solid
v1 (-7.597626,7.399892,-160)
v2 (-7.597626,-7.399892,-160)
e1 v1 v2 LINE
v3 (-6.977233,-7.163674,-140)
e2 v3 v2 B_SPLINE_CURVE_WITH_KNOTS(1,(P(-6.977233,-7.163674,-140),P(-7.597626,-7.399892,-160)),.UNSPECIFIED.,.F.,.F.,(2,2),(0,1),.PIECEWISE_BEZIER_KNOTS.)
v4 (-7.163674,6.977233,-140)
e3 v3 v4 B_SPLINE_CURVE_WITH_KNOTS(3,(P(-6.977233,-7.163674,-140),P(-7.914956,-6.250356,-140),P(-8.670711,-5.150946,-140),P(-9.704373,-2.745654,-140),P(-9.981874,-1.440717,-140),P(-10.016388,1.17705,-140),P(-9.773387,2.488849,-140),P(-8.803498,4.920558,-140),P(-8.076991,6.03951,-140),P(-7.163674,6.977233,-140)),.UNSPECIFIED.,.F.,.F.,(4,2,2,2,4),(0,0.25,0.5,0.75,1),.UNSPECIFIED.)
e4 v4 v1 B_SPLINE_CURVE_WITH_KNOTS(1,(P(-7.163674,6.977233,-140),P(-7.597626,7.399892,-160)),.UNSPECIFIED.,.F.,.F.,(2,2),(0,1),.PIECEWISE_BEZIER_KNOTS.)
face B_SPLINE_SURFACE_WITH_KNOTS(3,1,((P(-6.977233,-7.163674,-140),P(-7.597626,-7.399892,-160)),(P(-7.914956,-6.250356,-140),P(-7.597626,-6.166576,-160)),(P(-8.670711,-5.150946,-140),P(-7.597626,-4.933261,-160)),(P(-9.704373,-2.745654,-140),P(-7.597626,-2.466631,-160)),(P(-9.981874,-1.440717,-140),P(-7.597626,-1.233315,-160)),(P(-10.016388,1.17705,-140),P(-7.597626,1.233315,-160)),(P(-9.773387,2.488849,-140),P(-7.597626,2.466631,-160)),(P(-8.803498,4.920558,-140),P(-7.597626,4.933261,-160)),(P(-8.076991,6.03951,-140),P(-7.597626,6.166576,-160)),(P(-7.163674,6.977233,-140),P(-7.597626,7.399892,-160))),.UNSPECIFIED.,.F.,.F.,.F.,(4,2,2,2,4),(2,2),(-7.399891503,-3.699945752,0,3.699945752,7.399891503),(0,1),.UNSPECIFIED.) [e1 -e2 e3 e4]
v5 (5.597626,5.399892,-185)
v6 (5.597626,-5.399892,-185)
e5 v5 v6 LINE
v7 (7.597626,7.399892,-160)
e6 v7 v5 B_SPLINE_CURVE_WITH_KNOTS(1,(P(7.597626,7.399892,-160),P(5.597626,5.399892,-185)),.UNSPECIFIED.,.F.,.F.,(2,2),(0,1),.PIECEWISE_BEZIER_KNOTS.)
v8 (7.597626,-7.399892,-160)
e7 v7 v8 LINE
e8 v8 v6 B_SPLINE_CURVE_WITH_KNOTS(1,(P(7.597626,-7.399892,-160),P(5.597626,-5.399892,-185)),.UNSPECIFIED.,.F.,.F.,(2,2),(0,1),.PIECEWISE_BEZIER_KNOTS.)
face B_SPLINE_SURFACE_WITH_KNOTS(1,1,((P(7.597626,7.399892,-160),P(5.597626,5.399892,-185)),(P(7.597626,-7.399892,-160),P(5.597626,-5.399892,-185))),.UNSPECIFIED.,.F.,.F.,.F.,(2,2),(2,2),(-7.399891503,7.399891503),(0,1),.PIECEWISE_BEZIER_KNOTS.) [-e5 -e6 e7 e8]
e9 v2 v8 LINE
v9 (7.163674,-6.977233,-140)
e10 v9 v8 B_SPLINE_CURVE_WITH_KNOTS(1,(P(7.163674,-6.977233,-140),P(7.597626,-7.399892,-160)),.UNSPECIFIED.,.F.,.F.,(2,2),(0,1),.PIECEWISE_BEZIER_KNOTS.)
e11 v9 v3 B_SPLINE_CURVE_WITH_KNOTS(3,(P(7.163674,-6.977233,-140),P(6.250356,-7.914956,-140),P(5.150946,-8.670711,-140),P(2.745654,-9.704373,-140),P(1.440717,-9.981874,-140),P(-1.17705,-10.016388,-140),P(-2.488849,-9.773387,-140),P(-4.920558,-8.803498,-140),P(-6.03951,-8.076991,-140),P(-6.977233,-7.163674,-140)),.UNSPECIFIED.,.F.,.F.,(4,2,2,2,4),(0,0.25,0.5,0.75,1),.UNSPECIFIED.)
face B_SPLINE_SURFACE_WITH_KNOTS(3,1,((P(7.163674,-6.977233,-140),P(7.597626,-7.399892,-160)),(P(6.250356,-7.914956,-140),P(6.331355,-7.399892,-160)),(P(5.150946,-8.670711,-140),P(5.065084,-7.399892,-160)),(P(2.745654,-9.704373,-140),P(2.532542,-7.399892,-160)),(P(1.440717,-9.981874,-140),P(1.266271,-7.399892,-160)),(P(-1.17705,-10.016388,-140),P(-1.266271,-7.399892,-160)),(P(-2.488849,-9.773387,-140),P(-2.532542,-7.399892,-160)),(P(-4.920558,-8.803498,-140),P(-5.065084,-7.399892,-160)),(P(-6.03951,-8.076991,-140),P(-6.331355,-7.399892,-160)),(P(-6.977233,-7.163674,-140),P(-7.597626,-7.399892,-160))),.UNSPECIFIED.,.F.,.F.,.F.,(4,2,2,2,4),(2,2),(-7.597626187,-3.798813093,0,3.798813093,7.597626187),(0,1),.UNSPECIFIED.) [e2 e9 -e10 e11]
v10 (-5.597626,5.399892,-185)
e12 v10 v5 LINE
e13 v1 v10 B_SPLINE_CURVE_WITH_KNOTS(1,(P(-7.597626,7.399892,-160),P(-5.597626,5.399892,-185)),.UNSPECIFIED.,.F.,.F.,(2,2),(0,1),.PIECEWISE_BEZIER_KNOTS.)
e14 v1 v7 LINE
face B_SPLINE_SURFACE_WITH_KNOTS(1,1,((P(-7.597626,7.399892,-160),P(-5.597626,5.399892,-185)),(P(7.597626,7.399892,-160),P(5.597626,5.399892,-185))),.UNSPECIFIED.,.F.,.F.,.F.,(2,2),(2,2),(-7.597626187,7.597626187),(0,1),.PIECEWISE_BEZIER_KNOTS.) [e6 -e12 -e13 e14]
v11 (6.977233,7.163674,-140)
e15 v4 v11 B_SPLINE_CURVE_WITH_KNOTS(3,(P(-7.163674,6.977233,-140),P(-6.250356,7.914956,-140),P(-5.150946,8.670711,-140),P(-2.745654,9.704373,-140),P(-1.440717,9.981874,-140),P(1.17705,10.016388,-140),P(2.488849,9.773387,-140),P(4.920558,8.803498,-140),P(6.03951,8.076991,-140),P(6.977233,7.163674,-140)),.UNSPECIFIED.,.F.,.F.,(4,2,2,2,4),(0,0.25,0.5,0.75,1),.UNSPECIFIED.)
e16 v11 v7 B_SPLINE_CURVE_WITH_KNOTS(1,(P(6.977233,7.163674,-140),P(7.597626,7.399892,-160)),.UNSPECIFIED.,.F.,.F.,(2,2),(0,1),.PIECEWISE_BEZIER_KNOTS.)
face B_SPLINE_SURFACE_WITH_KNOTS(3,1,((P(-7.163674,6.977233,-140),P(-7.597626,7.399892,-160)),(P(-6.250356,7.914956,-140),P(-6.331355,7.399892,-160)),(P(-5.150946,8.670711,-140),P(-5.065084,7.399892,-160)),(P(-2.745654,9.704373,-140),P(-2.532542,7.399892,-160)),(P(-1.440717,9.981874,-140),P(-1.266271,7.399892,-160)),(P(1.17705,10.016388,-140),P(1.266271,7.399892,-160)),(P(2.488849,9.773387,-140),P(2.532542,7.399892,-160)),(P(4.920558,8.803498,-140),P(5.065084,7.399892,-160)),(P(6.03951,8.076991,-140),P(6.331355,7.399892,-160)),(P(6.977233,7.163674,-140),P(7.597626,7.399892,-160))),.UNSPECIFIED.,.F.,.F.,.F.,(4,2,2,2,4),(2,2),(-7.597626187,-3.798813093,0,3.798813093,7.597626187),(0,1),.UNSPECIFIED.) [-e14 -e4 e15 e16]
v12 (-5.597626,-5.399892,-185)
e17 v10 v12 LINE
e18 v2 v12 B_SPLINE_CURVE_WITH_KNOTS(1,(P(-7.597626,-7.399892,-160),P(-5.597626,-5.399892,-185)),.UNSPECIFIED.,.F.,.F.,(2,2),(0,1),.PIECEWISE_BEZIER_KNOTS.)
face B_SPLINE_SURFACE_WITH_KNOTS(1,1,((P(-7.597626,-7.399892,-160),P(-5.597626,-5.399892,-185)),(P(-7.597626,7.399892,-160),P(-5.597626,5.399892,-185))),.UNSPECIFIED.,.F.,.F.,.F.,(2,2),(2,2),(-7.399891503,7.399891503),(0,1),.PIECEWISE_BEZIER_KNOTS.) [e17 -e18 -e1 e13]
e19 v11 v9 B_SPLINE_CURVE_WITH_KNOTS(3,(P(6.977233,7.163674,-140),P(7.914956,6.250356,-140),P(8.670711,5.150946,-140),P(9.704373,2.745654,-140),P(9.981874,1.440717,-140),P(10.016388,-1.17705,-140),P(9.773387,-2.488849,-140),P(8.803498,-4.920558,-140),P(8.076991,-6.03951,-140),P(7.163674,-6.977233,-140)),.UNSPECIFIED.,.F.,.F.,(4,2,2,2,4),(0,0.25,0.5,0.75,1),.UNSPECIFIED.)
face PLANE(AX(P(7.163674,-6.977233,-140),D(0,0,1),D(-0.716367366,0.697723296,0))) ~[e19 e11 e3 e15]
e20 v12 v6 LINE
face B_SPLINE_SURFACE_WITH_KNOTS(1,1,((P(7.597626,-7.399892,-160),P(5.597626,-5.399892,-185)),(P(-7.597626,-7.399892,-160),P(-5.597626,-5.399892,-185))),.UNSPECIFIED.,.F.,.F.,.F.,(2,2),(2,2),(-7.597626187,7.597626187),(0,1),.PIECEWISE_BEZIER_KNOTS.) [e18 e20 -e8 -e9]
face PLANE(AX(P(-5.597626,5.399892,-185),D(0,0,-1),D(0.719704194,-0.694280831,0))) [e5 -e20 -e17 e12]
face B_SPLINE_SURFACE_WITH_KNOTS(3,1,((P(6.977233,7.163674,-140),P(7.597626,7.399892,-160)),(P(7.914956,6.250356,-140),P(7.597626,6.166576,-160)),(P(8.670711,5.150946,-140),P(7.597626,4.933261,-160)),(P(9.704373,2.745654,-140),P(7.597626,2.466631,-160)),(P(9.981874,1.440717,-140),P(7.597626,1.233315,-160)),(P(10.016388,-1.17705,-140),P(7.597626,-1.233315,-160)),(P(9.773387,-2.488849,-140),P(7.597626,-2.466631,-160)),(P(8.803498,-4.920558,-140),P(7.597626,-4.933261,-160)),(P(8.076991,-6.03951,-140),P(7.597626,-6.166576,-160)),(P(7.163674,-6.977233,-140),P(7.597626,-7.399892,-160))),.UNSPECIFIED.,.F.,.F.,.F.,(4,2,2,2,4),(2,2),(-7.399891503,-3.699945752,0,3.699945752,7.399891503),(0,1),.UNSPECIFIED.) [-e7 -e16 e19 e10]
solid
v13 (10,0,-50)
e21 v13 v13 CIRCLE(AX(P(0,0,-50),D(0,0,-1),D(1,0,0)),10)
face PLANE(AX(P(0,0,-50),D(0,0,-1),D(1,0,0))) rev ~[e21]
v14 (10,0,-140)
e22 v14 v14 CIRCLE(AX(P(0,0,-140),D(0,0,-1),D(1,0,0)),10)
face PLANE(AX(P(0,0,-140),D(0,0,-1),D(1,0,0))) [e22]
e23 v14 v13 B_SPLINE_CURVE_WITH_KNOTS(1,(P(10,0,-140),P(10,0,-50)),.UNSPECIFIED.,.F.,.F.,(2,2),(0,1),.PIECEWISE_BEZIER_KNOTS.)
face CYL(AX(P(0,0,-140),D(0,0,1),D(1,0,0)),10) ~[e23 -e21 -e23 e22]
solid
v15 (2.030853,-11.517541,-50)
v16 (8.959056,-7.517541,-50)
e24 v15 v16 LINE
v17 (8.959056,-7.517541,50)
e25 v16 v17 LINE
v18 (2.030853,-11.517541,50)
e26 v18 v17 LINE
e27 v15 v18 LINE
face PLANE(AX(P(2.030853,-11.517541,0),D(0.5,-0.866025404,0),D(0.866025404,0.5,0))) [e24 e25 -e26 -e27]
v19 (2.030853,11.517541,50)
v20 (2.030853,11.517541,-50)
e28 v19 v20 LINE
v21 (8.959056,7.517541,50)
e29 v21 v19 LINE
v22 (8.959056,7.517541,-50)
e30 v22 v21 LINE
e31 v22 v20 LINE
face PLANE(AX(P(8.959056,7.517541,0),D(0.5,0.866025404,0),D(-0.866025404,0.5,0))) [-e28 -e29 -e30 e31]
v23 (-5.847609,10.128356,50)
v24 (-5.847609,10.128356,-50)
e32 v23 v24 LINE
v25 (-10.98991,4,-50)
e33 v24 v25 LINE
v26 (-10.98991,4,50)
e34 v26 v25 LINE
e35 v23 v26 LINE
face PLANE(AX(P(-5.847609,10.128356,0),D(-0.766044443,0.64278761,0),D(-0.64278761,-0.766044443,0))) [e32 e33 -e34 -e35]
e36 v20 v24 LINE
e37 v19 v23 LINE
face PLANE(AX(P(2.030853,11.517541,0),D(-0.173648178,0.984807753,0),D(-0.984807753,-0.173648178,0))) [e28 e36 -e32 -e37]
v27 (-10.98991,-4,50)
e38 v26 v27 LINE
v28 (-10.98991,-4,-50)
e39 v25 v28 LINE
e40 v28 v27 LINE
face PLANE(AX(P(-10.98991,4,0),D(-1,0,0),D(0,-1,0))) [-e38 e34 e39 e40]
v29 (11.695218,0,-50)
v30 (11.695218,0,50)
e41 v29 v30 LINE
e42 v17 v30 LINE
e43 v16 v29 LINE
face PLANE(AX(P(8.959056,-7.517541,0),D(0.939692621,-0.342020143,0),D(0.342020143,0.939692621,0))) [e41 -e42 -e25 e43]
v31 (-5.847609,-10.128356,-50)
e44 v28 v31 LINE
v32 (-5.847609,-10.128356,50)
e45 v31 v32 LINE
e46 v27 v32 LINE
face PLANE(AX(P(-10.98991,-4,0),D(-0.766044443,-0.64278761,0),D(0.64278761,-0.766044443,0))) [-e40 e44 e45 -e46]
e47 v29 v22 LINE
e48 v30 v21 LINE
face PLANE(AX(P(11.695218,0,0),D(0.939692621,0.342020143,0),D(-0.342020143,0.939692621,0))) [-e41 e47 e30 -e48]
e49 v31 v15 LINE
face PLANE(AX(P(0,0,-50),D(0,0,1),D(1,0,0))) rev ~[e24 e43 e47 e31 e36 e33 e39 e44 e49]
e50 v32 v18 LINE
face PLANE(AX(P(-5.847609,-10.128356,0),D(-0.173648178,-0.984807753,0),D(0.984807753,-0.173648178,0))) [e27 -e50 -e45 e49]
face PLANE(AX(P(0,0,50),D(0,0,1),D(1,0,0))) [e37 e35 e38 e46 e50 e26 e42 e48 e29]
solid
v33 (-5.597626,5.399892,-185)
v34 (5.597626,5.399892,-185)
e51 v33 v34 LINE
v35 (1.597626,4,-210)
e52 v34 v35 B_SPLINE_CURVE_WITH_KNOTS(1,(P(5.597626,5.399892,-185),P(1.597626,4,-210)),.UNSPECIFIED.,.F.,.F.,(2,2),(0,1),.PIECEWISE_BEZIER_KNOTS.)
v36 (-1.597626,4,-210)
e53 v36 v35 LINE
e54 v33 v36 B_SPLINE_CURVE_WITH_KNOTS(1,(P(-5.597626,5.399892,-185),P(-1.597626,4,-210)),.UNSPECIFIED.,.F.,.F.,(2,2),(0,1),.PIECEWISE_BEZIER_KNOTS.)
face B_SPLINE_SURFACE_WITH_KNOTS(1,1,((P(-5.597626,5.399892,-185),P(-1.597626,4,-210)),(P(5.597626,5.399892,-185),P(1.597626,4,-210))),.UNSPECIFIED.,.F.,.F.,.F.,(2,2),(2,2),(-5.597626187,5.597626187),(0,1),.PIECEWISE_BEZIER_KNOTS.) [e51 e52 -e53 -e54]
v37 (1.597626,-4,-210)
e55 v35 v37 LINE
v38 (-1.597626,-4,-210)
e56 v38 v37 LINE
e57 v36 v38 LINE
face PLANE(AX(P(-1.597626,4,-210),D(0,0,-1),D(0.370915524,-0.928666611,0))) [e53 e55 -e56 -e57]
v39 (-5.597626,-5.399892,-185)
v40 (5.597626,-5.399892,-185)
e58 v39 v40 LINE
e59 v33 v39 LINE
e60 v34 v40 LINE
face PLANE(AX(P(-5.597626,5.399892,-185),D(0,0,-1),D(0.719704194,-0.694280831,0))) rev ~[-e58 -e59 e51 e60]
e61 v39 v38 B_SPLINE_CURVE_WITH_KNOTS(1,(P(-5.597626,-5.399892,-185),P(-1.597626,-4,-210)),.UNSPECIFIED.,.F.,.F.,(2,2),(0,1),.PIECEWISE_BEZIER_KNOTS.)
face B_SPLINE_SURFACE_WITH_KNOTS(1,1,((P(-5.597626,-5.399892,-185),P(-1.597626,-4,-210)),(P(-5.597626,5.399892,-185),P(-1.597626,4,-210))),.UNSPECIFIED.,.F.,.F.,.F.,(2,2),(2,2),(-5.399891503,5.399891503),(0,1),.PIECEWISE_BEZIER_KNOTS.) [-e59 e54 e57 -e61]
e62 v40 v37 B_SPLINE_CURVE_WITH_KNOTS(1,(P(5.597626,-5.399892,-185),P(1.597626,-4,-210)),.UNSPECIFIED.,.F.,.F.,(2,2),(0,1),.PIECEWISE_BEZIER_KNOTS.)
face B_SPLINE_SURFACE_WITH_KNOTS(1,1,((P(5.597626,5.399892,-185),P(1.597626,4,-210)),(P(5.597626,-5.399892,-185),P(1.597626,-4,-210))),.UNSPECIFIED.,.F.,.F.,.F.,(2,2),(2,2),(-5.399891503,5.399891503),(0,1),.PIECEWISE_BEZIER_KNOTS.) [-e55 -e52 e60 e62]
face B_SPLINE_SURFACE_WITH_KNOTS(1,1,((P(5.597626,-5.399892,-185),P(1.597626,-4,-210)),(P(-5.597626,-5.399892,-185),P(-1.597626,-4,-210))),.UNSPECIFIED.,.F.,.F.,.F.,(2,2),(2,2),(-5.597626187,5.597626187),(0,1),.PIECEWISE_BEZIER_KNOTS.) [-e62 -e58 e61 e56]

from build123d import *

# Parameters (mm, degrees)
F1_DEPTH = 50
F3_R     = 10
F4_R     = 10
F7_W     = 15.1952523738
F7_H     = 14.7997830063
F10_W    = 11.1952523738
F10_H    = 10.7997830063
F13_W    = 3.1952523738
F13_H    = 8


# Not quite as in the source:
# - the arcs of a loft's sections are written as splines that run evenly, so that the points pair up as in the source's solid


with BuildPart() as f1:
    # F0 (on Top) → F1 (new body, symmetric)
    with BuildSketch(Plane.XY):
        Polygon((-10.9899096778, 4), (-10.9899096778, -4), (-5.8476088003, -10.128355545), (2.0308532238, -11.5175409663), (8.959056454, -7.5175409663), (11.6952176007, 0), (8.959056454, 7.5175409663), (2.0308532238, 11.5175409663), (-5.8476088003, 10.128355545), align=None)
    extrude(amount=F1_DEPTH, both=True)


with BuildPart() as f5:
    # F3 (on offset) → F5 section 0
    with BuildSketch(Plane(origin=(0, 0, -140), x_dir=(1, 0, 0), z_dir=(0, 0, -1))):
        Circle(F3_R)
    # F4 (on face) → F5 section 1
    with BuildSketch(Plane(origin=(0, 0, -50), x_dir=(1, 0, 0), z_dir=(0, 0, -1))):
        Circle(F4_R)
    loft()


with BuildPart() as f8:
    # F3 (on offset) → F8 section 0
    with BuildSketch(Plane(origin=(0, 0, -140), x_dir=(1, 0, 0), z_dir=(0, 0, -1))):
        with BuildLine():
            add(Edge.make_bspline(
                [(7.163673657, 6.977232957), (6.2503559987, 7.9149556459), (5.1509464413, 8.6707106828), (2.7456535845, 9.704373209), (1.4407166651, 9.9818739963), (-1.1770496985, 10.0163879215), (-2.4888491633, 9.7733874797), (-4.9205578349, 8.8034983717), (-6.0395102681, 8.0769913154), (-6.977232957, 7.163673657)],
                knots=[0, 0, 0, 0, 0.25, 0.25, 0.5, 0.5, 0.75, 0.75, 1, 1, 1, 1], degree=3))
            add(Edge.make_bspline(
                [(-6.977232957, 7.163673657), (-7.9149556459, 6.2503559987), (-8.6707106828, 5.1509464413), (-9.704373209, 2.7456535845), (-9.9818739963, 1.4407166651), (-10.0163879215, -1.1770496985), (-9.7733874797, -2.4888491633), (-8.8034983717, -4.9205578349), (-8.0769913154, -6.0395102681), (-7.163673657, -6.977232957)],
                knots=[0, 0, 0, 0, 0.25, 0.25, 0.5, 0.5, 0.75, 0.75, 1, 1, 1, 1], degree=3))
            add(Edge.make_bspline(
                [(-7.163673657, -6.977232957), (-6.2503559987, -7.9149556459), (-5.1509464413, -8.6707106828), (-2.7456535845, -9.704373209), (-1.4407166651, -9.9818739963), (1.1770496985, -10.0163879215), (2.4888491633, -9.7733874797), (4.9205578349, -8.8034983717), (6.0395102681, -8.0769913154), (6.977232957, -7.163673657)],
                knots=[0, 0, 0, 0, 0.25, 0.25, 0.5, 0.5, 0.75, 0.75, 1, 1, 1, 1], degree=3))
            add(Edge.make_bspline(
                [(6.977232957, -7.163673657), (7.9149556459, -6.2503559987), (8.6707106828, -5.1509464413), (9.704373209, -2.7456535845), (9.9818739963, -1.4407166651), (10.0163879215, 1.1770496985), (9.7733874797, 2.4888491633), (8.8034983717, 4.9205578349), (8.0769913154, 6.0395102681), (7.163673657, 6.977232957)],
                knots=[0, 0, 0, 0, 0.25, 0.25, 0.5, 0.5, 0.75, 0.75, 1, 1, 1, 1], degree=3))
        make_face()
    # F7 (on offset) → F8 section 1
    with BuildSketch(Plane(origin=(0, 0, -160), x_dir=(1, 0, 0), z_dir=(0, 0, -1))):
        Rectangle(F7_W, F7_H)
    loft(ruled=True)

    # F7 (on offset) → F11 section 0
    with BuildSketch(Plane(origin=(0, 0, -160), x_dir=(1, 0, 0), z_dir=(0, 0, -1))):
        Rectangle(F7_W, F7_H)
    # F10 (on offset) → F11 section 1
    with BuildSketch(Plane(origin=(0, 0, -185), x_dir=(1, 0, 0), z_dir=(0, 0, -1))):
        Rectangle(F10_W, F10_H)
    loft()


with BuildPart() as f14:
    # F10 (on offset) → F14 section 0
    with BuildSketch(Plane(origin=(0, 0, -185), x_dir=(1, 0, 0), z_dir=(0, 0, -1))):
        Rectangle(F10_W, F10_H)
    # F13 (on offset) → F14 section 1
    with BuildSketch(Plane(origin=(0, 0, -210), x_dir=(1, 0, 0), z_dir=(0, 0, -1))):
        Rectangle(F13_W, F13_H)
    loft()


solid = Compound([f1.part, f5.part, f8.part, f14.part])
